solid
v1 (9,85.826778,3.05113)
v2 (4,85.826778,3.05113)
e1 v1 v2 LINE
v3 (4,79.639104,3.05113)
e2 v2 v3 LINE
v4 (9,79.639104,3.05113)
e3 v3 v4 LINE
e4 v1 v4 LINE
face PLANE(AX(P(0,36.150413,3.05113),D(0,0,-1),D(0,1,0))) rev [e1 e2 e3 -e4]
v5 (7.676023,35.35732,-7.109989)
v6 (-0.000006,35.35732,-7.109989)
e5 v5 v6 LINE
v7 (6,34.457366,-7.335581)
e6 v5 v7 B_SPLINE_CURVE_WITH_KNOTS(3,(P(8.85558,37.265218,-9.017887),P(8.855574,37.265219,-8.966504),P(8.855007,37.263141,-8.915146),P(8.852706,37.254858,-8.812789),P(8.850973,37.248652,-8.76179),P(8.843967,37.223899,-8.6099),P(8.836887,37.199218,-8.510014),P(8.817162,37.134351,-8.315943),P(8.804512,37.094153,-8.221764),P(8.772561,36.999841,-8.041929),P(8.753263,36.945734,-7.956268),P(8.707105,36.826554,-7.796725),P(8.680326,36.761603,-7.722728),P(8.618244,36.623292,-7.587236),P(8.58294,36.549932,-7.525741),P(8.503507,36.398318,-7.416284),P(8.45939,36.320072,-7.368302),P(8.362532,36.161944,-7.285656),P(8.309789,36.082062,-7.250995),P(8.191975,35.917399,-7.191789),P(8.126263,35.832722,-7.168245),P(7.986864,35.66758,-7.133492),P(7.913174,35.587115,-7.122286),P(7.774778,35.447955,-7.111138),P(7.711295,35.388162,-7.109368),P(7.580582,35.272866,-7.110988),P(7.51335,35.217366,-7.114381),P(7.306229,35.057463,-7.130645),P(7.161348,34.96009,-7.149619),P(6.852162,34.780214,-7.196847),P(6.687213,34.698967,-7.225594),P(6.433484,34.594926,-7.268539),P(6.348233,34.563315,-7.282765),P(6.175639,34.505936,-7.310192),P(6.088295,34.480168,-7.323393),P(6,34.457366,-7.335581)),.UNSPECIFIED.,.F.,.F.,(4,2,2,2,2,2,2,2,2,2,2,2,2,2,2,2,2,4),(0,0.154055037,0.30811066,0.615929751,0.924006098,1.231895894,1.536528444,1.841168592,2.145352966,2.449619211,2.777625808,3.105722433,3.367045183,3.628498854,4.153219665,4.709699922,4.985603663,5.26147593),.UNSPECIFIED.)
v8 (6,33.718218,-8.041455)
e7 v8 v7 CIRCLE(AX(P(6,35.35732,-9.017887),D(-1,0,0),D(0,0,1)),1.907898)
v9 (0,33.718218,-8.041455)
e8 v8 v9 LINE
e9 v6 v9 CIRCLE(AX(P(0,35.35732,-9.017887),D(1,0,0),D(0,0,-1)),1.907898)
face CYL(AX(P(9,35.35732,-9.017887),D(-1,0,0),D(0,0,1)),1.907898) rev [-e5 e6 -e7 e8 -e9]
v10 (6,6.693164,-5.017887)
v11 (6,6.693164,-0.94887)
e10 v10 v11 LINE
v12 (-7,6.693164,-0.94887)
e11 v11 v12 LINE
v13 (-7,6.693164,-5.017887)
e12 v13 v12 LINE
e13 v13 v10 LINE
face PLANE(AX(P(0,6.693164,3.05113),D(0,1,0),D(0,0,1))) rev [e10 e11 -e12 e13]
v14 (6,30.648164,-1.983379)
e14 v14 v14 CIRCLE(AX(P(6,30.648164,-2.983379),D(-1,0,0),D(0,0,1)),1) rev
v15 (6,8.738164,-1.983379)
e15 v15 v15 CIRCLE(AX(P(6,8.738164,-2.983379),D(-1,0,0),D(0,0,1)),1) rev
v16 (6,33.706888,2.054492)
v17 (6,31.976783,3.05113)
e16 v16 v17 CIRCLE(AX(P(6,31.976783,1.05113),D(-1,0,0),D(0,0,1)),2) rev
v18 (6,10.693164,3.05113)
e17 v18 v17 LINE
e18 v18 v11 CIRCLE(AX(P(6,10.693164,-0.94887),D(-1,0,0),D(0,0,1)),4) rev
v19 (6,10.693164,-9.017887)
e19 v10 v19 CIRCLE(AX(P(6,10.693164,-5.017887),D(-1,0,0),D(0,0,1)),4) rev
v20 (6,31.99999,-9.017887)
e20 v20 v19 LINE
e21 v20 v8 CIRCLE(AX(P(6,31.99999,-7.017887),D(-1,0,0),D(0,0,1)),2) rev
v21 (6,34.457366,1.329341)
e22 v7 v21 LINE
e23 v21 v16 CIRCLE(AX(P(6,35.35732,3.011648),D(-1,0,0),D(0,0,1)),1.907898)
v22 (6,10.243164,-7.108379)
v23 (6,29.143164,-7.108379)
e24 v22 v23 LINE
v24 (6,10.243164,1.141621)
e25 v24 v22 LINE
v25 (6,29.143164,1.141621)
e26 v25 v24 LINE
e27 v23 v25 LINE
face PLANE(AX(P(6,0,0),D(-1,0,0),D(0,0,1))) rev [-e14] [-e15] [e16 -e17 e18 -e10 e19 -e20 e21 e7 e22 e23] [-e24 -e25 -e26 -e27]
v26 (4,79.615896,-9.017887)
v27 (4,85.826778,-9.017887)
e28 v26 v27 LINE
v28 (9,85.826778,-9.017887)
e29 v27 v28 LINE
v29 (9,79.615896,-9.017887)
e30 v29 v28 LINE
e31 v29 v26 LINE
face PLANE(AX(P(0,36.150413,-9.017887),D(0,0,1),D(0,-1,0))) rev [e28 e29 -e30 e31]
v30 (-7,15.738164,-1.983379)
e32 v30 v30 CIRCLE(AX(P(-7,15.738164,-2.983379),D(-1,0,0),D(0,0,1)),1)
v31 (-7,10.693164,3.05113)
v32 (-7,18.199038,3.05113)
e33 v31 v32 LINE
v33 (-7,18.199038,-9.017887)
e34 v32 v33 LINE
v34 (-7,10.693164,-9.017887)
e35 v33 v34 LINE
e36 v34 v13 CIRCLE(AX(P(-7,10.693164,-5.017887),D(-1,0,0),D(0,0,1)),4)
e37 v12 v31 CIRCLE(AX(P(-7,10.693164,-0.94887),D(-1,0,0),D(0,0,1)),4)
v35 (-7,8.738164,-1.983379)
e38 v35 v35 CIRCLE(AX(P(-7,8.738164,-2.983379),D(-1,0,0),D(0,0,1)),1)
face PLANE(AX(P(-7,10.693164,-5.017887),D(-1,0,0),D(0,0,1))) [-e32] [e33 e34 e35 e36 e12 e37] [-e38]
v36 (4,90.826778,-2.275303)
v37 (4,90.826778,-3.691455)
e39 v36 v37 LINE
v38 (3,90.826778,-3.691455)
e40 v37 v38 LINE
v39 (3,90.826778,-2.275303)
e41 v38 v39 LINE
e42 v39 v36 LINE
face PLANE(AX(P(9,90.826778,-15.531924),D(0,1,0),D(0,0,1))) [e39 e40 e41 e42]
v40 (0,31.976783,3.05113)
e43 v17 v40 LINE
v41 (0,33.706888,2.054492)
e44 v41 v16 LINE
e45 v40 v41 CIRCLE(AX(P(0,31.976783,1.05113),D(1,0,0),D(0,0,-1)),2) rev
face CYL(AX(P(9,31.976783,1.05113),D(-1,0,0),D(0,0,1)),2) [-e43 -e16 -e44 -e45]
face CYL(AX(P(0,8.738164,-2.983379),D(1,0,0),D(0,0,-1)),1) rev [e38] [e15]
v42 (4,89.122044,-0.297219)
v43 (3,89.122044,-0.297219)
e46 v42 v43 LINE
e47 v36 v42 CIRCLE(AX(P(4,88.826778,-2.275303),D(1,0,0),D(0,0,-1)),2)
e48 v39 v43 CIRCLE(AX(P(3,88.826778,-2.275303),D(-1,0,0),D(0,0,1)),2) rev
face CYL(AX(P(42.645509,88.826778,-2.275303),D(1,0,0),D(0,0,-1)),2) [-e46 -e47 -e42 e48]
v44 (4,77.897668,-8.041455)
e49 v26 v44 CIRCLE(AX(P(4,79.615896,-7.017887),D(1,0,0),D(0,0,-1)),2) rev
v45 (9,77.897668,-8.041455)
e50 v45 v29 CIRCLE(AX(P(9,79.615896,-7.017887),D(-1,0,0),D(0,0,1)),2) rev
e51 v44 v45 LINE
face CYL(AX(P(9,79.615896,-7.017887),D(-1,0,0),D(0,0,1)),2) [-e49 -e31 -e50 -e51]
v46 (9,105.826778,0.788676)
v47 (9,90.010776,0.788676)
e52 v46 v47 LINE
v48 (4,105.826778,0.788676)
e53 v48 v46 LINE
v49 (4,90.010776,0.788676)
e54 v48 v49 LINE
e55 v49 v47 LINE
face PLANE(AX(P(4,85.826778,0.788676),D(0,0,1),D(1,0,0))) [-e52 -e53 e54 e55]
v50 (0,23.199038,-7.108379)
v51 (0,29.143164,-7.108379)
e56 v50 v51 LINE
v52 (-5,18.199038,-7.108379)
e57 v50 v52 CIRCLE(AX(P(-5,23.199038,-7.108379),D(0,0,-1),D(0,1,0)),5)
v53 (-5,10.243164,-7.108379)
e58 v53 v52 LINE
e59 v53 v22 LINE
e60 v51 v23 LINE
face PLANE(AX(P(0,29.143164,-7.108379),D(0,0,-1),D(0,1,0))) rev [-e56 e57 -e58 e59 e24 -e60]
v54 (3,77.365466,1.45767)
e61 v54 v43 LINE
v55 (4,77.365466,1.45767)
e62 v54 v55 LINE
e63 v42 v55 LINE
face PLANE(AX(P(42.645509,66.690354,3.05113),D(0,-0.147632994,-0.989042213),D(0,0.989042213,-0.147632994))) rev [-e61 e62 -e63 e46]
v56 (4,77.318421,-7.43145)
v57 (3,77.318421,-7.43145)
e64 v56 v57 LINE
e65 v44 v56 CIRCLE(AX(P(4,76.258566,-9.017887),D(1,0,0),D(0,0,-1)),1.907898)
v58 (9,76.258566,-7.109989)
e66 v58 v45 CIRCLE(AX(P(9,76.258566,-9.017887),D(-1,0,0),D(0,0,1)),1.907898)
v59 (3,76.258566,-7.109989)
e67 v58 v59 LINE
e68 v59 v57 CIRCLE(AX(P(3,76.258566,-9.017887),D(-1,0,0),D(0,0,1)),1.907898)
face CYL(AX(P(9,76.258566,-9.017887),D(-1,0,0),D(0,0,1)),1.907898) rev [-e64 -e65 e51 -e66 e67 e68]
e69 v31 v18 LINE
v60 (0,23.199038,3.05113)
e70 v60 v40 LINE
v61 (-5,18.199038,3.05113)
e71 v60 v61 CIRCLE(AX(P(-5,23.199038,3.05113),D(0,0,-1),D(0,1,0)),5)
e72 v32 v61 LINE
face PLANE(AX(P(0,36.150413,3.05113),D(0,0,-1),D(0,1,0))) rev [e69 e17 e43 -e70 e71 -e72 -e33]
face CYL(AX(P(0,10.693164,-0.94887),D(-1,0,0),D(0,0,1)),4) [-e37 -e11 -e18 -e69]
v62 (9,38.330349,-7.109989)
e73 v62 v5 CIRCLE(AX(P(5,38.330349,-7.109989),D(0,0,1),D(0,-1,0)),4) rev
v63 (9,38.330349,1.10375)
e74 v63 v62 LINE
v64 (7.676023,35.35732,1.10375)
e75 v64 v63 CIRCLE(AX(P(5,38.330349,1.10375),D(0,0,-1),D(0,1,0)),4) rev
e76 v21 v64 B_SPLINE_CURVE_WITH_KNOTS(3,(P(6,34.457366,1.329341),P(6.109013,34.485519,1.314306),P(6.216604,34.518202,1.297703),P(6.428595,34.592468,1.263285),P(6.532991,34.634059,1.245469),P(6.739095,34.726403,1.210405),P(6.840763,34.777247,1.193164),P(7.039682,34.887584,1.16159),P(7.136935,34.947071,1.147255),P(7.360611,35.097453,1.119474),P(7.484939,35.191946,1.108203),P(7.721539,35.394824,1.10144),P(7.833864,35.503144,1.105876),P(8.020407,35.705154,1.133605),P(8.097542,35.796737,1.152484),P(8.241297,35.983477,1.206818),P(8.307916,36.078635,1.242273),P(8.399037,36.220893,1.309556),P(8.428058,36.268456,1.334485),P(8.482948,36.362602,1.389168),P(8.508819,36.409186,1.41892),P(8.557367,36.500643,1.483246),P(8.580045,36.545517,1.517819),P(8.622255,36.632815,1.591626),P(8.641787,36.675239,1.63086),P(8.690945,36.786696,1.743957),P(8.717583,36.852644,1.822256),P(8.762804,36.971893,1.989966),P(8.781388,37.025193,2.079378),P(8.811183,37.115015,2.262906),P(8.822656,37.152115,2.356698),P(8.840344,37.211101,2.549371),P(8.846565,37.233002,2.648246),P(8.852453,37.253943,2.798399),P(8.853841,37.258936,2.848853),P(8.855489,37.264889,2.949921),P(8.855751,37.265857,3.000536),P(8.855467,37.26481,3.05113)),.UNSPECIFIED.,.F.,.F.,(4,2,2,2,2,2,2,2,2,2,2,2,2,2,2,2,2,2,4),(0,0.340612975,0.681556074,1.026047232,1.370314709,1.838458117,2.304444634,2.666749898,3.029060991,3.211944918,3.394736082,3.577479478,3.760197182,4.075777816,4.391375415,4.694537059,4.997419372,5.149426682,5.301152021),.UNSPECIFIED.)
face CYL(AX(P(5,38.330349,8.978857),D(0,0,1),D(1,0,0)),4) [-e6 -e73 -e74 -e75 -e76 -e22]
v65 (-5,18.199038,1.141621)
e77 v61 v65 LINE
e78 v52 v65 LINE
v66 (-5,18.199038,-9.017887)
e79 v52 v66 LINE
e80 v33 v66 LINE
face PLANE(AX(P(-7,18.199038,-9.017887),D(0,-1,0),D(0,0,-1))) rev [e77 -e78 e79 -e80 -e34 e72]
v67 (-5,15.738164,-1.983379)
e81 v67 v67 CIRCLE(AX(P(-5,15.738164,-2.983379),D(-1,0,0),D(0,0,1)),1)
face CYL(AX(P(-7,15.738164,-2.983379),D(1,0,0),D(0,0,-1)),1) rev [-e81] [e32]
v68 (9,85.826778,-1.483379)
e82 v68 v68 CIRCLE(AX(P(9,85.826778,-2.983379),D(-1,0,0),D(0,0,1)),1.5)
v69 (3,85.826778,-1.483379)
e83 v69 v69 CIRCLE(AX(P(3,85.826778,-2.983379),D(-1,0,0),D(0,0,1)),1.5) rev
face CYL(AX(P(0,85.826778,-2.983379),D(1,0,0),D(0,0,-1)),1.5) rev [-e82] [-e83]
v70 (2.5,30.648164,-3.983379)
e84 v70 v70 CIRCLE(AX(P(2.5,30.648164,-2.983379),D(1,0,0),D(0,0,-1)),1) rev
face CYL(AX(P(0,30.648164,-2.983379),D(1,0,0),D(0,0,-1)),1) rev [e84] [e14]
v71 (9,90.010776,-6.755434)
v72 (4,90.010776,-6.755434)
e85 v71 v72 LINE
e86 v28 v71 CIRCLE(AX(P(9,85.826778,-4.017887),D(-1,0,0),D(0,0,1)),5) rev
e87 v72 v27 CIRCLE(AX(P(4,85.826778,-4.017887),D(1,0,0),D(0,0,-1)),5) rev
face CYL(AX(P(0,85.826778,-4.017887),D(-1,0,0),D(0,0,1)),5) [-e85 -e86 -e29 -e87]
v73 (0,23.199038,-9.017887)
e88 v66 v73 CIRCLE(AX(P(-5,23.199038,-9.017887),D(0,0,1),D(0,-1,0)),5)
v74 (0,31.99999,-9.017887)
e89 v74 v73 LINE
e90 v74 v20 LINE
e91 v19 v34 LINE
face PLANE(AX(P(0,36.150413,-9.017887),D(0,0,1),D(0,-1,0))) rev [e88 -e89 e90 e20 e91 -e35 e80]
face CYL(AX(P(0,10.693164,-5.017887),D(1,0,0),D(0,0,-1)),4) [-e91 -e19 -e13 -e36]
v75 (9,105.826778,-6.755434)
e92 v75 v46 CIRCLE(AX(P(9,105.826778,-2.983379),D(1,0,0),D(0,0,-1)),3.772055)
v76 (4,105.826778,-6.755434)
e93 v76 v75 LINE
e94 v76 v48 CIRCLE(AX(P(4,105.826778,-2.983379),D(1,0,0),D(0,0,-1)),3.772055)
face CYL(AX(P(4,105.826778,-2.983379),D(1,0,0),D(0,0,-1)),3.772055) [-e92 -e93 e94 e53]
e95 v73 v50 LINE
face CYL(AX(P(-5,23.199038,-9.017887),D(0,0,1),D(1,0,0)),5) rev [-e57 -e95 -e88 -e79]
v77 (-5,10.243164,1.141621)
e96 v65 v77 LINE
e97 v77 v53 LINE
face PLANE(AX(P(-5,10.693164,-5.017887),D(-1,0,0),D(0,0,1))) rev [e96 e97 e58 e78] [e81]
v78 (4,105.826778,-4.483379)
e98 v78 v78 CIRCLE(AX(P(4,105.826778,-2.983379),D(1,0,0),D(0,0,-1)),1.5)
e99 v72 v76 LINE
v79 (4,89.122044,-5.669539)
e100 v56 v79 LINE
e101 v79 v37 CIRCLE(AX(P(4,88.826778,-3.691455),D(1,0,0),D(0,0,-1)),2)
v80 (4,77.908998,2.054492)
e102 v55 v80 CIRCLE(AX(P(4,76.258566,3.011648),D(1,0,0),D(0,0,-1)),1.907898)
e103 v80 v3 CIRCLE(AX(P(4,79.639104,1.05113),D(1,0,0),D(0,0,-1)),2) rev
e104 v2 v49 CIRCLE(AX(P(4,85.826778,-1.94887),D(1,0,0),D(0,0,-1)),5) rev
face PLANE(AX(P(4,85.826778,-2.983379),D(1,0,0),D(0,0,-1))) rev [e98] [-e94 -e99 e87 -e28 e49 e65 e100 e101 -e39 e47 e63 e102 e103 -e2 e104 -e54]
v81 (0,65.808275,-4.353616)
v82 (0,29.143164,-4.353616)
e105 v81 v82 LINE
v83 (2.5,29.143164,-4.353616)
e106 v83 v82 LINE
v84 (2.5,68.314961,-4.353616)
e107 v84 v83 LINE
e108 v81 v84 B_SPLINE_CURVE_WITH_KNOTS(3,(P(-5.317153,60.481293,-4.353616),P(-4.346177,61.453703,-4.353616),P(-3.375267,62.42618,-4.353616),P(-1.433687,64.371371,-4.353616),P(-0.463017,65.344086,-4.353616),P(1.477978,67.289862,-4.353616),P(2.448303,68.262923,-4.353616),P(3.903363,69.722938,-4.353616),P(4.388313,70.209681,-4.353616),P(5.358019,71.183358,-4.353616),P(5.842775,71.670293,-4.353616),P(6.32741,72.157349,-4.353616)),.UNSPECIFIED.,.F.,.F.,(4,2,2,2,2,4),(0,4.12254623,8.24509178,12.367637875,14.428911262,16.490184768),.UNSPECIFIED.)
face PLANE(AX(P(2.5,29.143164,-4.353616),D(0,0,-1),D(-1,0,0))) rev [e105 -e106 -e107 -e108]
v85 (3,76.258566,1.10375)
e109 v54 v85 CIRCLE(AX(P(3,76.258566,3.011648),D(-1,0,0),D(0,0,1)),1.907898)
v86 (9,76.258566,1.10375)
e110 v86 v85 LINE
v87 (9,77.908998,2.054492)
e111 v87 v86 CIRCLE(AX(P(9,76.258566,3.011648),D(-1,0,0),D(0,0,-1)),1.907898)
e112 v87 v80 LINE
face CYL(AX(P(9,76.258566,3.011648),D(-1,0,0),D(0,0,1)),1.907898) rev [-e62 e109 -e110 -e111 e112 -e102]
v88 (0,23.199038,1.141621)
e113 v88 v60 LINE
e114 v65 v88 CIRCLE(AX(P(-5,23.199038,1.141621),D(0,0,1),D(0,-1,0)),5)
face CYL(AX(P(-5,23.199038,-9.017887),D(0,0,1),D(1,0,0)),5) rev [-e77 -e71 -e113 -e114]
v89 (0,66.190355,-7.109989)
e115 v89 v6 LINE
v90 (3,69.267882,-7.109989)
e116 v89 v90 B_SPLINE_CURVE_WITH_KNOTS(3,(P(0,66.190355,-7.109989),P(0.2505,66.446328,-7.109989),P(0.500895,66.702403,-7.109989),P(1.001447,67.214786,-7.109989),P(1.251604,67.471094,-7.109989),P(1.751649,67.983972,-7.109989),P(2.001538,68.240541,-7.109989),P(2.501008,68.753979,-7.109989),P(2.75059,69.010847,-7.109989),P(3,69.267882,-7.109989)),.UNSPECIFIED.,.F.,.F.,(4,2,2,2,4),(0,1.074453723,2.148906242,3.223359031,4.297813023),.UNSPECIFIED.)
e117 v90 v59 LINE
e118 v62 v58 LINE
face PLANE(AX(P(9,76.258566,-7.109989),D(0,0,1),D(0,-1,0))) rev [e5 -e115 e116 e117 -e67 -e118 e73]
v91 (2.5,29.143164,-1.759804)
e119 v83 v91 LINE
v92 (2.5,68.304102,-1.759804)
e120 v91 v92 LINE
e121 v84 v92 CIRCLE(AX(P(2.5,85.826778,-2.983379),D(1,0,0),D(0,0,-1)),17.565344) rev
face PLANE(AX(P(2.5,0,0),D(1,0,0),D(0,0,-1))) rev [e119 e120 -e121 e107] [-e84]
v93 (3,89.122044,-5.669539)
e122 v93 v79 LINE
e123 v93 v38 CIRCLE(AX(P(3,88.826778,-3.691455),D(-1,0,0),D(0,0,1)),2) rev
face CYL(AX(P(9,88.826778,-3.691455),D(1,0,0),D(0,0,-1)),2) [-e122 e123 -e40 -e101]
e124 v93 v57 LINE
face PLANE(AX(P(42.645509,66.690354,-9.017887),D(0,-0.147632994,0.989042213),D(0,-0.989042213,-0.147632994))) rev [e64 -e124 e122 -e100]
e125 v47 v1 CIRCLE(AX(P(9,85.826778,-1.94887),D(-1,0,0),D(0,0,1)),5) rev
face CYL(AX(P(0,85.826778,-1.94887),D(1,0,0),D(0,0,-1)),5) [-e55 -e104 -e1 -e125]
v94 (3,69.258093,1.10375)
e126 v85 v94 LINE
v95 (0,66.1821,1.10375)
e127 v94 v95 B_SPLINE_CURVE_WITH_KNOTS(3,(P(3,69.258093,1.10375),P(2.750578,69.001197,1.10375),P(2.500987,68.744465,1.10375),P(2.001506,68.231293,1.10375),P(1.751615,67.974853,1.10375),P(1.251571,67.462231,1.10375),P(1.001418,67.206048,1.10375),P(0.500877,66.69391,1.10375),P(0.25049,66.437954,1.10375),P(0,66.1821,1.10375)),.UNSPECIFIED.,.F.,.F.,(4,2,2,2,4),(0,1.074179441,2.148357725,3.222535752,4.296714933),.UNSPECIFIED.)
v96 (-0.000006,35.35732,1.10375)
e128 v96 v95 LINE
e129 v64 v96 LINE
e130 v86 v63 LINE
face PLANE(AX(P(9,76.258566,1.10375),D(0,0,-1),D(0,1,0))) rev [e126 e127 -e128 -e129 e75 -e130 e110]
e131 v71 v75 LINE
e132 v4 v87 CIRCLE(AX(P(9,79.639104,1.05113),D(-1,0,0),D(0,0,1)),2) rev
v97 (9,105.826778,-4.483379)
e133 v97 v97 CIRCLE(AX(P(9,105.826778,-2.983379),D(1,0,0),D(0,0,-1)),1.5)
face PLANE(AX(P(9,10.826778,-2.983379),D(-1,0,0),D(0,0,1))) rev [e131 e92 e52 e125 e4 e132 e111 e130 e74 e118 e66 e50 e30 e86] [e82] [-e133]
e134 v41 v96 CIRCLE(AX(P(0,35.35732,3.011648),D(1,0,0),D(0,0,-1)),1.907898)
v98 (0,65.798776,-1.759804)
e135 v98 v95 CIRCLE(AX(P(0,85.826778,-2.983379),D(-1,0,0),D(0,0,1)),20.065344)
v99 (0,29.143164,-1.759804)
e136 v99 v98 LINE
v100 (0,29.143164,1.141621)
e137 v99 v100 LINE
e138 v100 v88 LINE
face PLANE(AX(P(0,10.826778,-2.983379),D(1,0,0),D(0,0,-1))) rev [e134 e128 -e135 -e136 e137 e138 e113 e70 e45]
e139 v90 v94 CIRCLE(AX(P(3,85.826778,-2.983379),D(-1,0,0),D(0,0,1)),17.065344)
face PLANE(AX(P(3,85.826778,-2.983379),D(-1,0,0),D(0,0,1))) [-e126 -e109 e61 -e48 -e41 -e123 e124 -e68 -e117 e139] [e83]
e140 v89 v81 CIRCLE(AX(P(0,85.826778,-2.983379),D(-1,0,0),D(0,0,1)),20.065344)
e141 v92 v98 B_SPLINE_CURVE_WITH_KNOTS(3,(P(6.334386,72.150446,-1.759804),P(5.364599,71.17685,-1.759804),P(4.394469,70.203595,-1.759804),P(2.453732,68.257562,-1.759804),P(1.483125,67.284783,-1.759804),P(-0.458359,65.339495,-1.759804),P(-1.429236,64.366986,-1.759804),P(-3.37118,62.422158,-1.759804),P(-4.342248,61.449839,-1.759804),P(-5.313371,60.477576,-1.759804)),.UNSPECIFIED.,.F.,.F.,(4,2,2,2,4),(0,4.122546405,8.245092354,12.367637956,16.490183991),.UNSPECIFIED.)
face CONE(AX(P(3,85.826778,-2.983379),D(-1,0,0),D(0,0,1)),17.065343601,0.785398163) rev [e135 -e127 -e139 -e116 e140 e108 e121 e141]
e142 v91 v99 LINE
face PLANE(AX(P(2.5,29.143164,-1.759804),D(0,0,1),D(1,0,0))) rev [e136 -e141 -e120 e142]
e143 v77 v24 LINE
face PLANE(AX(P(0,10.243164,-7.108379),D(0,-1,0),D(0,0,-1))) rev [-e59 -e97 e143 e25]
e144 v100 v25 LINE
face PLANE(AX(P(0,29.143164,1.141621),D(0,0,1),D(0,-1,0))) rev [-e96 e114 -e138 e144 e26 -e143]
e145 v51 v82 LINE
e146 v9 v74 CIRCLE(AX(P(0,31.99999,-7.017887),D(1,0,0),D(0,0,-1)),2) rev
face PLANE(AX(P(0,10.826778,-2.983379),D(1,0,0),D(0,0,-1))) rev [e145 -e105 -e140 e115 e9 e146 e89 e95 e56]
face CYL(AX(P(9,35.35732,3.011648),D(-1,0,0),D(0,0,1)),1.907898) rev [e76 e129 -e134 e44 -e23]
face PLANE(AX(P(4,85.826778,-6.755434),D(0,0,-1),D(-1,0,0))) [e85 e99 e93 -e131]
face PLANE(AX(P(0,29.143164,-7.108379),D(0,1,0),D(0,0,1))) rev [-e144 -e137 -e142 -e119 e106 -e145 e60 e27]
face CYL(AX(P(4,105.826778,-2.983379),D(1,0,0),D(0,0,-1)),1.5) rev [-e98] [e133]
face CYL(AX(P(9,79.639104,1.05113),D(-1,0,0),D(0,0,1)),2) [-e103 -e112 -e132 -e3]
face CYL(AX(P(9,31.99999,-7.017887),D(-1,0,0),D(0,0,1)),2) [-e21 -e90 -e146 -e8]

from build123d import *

# Parameters (mm, degrees)
SKETCH1_R               = 10
SKETCH1_R_2             = 0.8
SKETCH1_R_3             = 3.301767793
BOSS_EXTRUDE1_DEPTH     = 1.5
SKETCH2_R               = 10
BOSS_EXTRUDE2_DEPTH     = 9
CUT_EXTRUDE1_DEPTH      = 93.583714931
CUT_EXTRUDE1_DEPTH_BACK = 93.583714931
SKETCH3_R               = 1.5
FILLET1_R               = 5
SKETCH4_R               = 1.5
BOSS_EXTRUDE3_DEPTH     = 5
CUT_EXTRUDE2_DEPTH      = 4
FILLET3_R               = 2
SKETCH6_W               = 12.069016708
SKETCH6_H               = 36.150412664
BOSS_EXTRUDE4_DEPTH     = 9
CUT_EXTRUDE3_DEPTH      = 112.059195252
CUT_EXTRUDE3_DEPTH_BACK = 112.059195252
CUT_EXTRUDE4_DEPTH      = 111.336877259
CUT_EXTRUDE4_DEPTH_BACK = 111.336877259
SKETCH8_R               = 1
SKETCH8_W               = 8.25
SKETCH8_H               = 18.9
FILLET4_R               = 4
SKETCH9_W               = 24.382356312
SKETCH9_H               = 35.371587325
CUT_EXTRUDE5_DEPTH      = 3
FILLET5_R               = 4
SKETCH10_R              = 20.065343601
CUT_EXTRUDE6_DEPTH      = 3
CUT_EXTRUDE7_DEPTH      = 111.33687725
CUT_EXTRUDE7_DEPTH_BACK = 111.33687725
FILLET6_R               = 2
CHAMFER1_SIZE           = 3
BOSS_EXTRUDE5_START     = 7
SKETCH12_R              = 1
BOSS_EXTRUDE5_DEPTH     = 7
SKETCH13_W              = 8.25
SKETCH13_H              = 7.955873605
CUT_EXTRUDE8_DEPTH      = 5
FILLET7_R               = 5
SKETCH14_W              = 2.593812074
SKETCH14_H              = 55.177011507
CUT_EXTRUDE9_DEPTH      = 2.5


# Some blends are built 0.0001 mm under size
with BuildPart() as part:
    # Sketch1 → Boss-Extrude1 (new body)
    with BuildSketch(Plane(origin=(0, 0, 0), x_dir=(0, 0, -1), z_dir=(1, 0, 0))):
        with Locations((2.983378847, 10.826778074)):
            Circle(SKETCH1_R)
        with Locations((2.983378847, 18.576778074)):
            Circle(SKETCH1_R_2, mode=Mode.SUBTRACT)
        with Locations((2.983378847, 3.076778074)):
            Circle(SKETCH1_R_2, mode=Mode.SUBTRACT)
        with Locations((-3.266621153, 10.826778074)):
            Circle(SKETCH1_R_2, mode=Mode.SUBTRACT)
        with Locations((9.233378847, 10.826778074)):
            Circle(SKETCH1_R_2, mode=Mode.SUBTRACT)
        with Locations((2.983378847, 10.826778074)):
            Circle(SKETCH1_R_3, mode=Mode.SUBTRACT)
    extrude(amount=BOSS_EXTRUDE1_DEPTH)

    # Sketch2 → Boss-Extrude2 (add)
    with BuildSketch(Plane.ZY):
        with BuildLine():
            Line((-15.531923741, 90.826778074), (9.565166047, 90.826778074))
            Line((9.565166047, 90.826778074), (9.565166047, 10.826778074))
            ThreePointArc((9.565166047, 10.826778074), (-2.983378847, -1.721766821), (-15.531923741, 10.826778074))
            Line((-15.531923741, 10.826778074), (-15.531923741, 90.826778074))
        make_face()
        with Locations((-2.983378847, 10.826778074)):
            Circle(SKETCH2_R, mode=Mode.SUBTRACT)
    extrude(amount=-BOSS_EXTRUDE2_DEPTH)

    # Sketch3 → Cut-Extrude1 (cut, two sides: drawn at the far end of the back side and taken through both)
    with BuildSketch(Plane(origin=(9, 0, 0), x_dir=(0, 0, -1), z_dir=(1, 0, 0)).offset(-CUT_EXTRUDE1_DEPTH_BACK)):
        with Locations((2.983378847, 85.826778074)):
            Circle(SKETCH3_R)
        with BuildLine():
            Line((-3.051129507, 36.150412664), (-3.051129507, 97.572569437))
            Line((-3.051129507, 97.572569437), (-16.389018159, 97.572569437))
            Line((-16.389018159, 97.572569437), (-16.389018159, 8.14109285))
            Line((-16.389018159, 8.14109285), (-9.565166047, 10.826778074))
            add(Edge.make_bspline(
                [(-9.565166047, 10.826778074), (-9.644230884, 15.122204253), (-6.916245701, 23.507010268), (-3.42826878, 31.561714956), (-3.051129507, 36.150412664)],
                knots=[0, 0, 0, 0, 0.482384809, 1, 1, 1, 1], degree=3))
        make_face()
        with BuildLine():
            Line((22.355775853, 8.14109285), (15.531923741, 10.826778074))
            add(Edge.make_bspline(
                [(15.531923741, 10.826778074), (15.610988578, 15.122204253), (12.883003395, 23.507010268), (9.395026474, 31.561714956), (9.017887201, 36.150412664)],
                knots=[0, 0, 0, 0, 0.482384809, 1, 1, 1, 1], degree=3))
            Line((9.017887201, 36.150412664), (9.017887201, 97.572569437))
            Line((9.017887201, 97.572569437), (22.355775853, 97.572569437))
            Line((22.355775853, 97.572569437), (22.355775853, 8.14109285))
        make_face()
    extrude(amount=CUT_EXTRUDE1_DEPTH + CUT_EXTRUDE1_DEPTH_BACK, mode=Mode.SUBTRACT)

    # Fillet1
    fillet1_edges = [part.edges().sort_by_distance(p)[0] for p in [
        (4.5, 90.826778074, 3.051129507),
        (4.5, 90.826778074, -9.017887201),
    ]]
    fillet(fillet1_edges, radius=FILLET1_R)

    # Sketch4 → Boss-Extrude3 (add)
    with BuildSketch(Plane(origin=(9, 0, 0), x_dir=(0, 0, -1), z_dir=(1, 0, 0))):
        with BuildLine():
            Line((-0.788675957, 85.826778074), (-0.788675957, 105.826778074))
            ThreePointArc((-0.788675957, 105.826778074), (2.983378847, 109.598832877), (6.755433651, 105.826778074))
            Line((6.755433651, 105.826778074), (6.755433651, 85.826778074))
            ThreePointArc((6.755433651, 85.826778074), (2.983378847, 82.05472327), (-0.788675957, 85.826778074))
        make_face()
        with Locations((2.983378847, 105.826778074)):
            Circle(SKETCH4_R, mode=Mode.SUBTRACT)
        with Locations((2.983378847, 85.826778074)):
            Circle(SKETCH4_R, mode=Mode.SUBTRACT)
    extrude(amount=-BOSS_EXTRUDE3_DEPTH)

    # Sketch5 → Cut-Extrude2 (cut)
    with BuildSketch(Plane.ZY):
        Polygon((3.051129507, 66.690354093), (-0.520583075, 90.618436978), (8.994411849, 90.618436978), (4.452818785, 66.690354093), align=None)
        Polygon((-9.017887201, 66.690354093), (-5.446174619, 90.618436978), (-12.469802715, 95.280611626), (-31.447569196, 66.690354093), align=None)
    extrude(amount=-CUT_EXTRUDE2_DEPTH, mode=Mode.SUBTRACT)

    # Fillet3
    fillet3_edges = [part.edges().sort_by_distance(p)[0] for p in [
        (2, 90.618436978, -5.446174619),
        (2, 90.618436978, -0.520583075),
    ]]
    fillet(fillet3_edges, radius=FILLET3_R)

    # Sketch6 → Boss-Extrude4 (add)
    with BuildSketch(Plane(origin=(9, 0, 0), x_dir=(0, 0, -1), z_dir=(1, 0, 0))):
        with Locations((2.983378847, 18.075206332)):
            Rectangle(SKETCH6_W, SKETCH6_H)
    extrude(amount=-BOSS_EXTRUDE4_DEPTH)

    # Sketch7 → Cut-Extrude3 (cut, two sides: drawn at the far end of the back side and taken through both)
    with BuildSketch(Plane(origin=(9, 0, 0), x_dir=(0, 0, -1), z_dir=(1, 0, 0)).offset(-CUT_EXTRUDE3_DEPTH_BACK)):
        Polygon((-3.051129507, -1.9847985), (-23.499593466, -1.9847985), (-3.051129507, 36.150412664), (-3.051129507, 6.693164213), (9.017887201, 6.693164213), (9.017887201, 36.150412664), (33.091996179, 2.744303699), (9.017887201, -7.659721138), align=None)
    extrude(amount=CUT_EXTRUDE3_DEPTH + CUT_EXTRUDE3_DEPTH_BACK, mode=Mode.SUBTRACT)

    # Sketch8 → Cut-Extrude4 (cut, two sides: drawn at the far end of the back side and taken through both)
    with BuildSketch(Plane(origin=(9, 0, 0), x_dir=(0, 0, -1), z_dir=(1, 0, 0)).offset(-CUT_EXTRUDE4_DEPTH_BACK)):
        with Locations((2.983378847, 30.648164213)):
            Circle(SKETCH8_R)
        with Locations((2.983378847, 8.738164213)):
            Circle(SKETCH8_R)
        with Locations((2.983378847, 19.693164213)):
            Rectangle(SKETCH8_W, SKETCH8_H)
    extrude(amount=CUT_EXTRUDE4_DEPTH + CUT_EXTRUDE4_DEPTH_BACK, mode=Mode.SUBTRACT)

    # Fillet4
    fillet4_edges = [part.edges().sort_by_distance(p)[0] for p in [
        (4.5, 6.693164213, -9.017887201),
        (4.5, 6.693164213, 3.051129507),
    ]]
    fillet(fillet4_edges, radius=FILLET4_R)

    # Sketch9 → Cut-Extrude5 (cut)
    with BuildSketch(Plane(origin=(9, 0, 0), x_dir=(0, 0, -1), z_dir=(1, 0, 0))):
        with Locations((3.21232116, 16.771571926)):
            Rectangle(SKETCH9_W, SKETCH9_H)
    extrude(amount=-CUT_EXTRUDE5_DEPTH, mode=Mode.SUBTRACT)

    # Fillet5
    # the kernel refuses this fillet: 4 mm, written as the material it takes off along each edge
    with BuildSketch(Plane(origin=(9, 34.457365588, -18.700345567), x_dir=(0, 1, 0), z_dir=(0, 0, 1))) as fillet5_piece_1:
        with BuildLine():
            CenterArc((3.872983346, 4), FILLET5_R, 194.477512186, 75.522487814)
            Line((0, 3), (-0.077459667, 2.98))
            ThreePointArc((-0.077459667, 2.98), (-0.08, 1.5), (-0.08, 0))
            Line((-0.08, 0), (0, -0.08))
            Line((0, -0.08), (3.872983346, -0.08))
            Line((3.872983346, -0.08), (3.872983346, 0))
        make_face()
    extrude(amount=31.43393344, mode=Mode.SUBTRACT)

    # Sketch10 → Cut-Extrude6 (cut)
    with BuildSketch(Plane.ZY):
        with Locations((-2.983378847, 85.826778074)):
            Circle(SKETCH10_R)
    extrude(amount=-CUT_EXTRUDE6_DEPTH, mode=Mode.SUBTRACT)

    # Sketch11 → Cut-Extrude7 (cut, two sides: drawn at the far end of the back side and taken through both)
    with BuildSketch(Plane.ZY.offset(-CUT_EXTRUDE7_DEPTH_BACK)):
        with BuildLine():
            Line((-7.109989343, 76.258566083), (-7.109989343, 35.357320381))
            ThreePointArc((-7.109989343, 35.357320381), (-9.017887201, 33.449422522), (-10.925785059, 35.357320381))
            Line((-10.925785059, 35.357320381), (-10.925785059, 76.258566083))
            ThreePointArc((-10.925785059, 76.258566083), (-9.017887201, 78.166463942), (-7.109989343, 76.258566083))
        make_face()
        with BuildLine():
            Line((1.103749815, 76.258566083), (1.103749815, 35.357320381))
            ThreePointArc((1.103749815, 35.357320381), (3.011647673, 33.449422522), (4.919545531, 35.357320381))
            Line((4.919545531, 35.357320381), (4.919545531, 76.258566083))
            ThreePointArc((4.919545531, 76.258566083), (3.011647673, 78.166463942), (1.103749815, 76.258566083))
        make_face()
    extrude(amount=CUT_EXTRUDE7_DEPTH + CUT_EXTRUDE7_DEPTH_BACK, mode=Mode.SUBTRACT)

    # Fillet6
    fillet6_edges = [part.edges().sort_by_distance(p)[0] for p in [
        (3, 33.449422522, -9.017887201),
        (3, 33.449831083, 3.051129507),
        (6.5, 78.166463942, -9.017887201),
        (6.5, 78.166055381, 3.051129507),
    ]]
    fillet(fillet6_edges, radius=FILLET6_R)

    # Chamfer1
    chamfer1_edges = [part.edges().sort_by_distance(p)[0] for p in [
        (3, 65.761444608, -3.003546718),
    ]]
    chamfer(chamfer1_edges, length=CHAMFER1_SIZE - 0.0001)  # a hair under: the kernel refuses the full size

    # Sketch12 → Boss-Extrude5 (add)
    with BuildSketch(Plane.ZY.offset(BOSS_EXTRUDE5_START)):
        with BuildLine():
            Line((-5.017887201, 6.693164213), (-0.948870493, 6.693164213))
            ThreePointArc((-0.948870493, 6.693164213), (1.879556632, 7.864737088), (3.051129507, 10.693164213))
            Line((3.051129507, 10.693164213), (3.051129507, 18.199037818))
            Line((3.051129507, 18.199037818), (-9.017887201, 18.199037818))
            Line((-9.017887201, 18.199037818), (-9.017887201, 10.693164213))
            ThreePointArc((-9.017887201, 10.693164213), (-7.846314326, 7.864737088), (-5.017887201, 6.693164213))
        make_face()
        with Locations((-2.983378847, 8.738164213)):
            Circle(SKETCH12_R, mode=Mode.SUBTRACT)
        with Locations((-2.983378847, 15.738164213)):
            Circle(SKETCH12_R, mode=Mode.SUBTRACT)
    extrude(amount=-BOSS_EXTRUDE5_DEPTH)

    # Sketch13 → Cut-Extrude8 (cut)
    with BuildSketch(Plane(origin=(0, 0, 0), x_dir=(0, 0, -1), z_dir=(1, 0, 0))):
        with Locations((2.983378847, 14.221101016)):
            Rectangle(SKETCH13_W, SKETCH13_H)
    extrude(amount=-CUT_EXTRUDE8_DEPTH, mode=Mode.SUBTRACT)

    # Fillet7
    fillet7_edges = [part.edges().sort_by_distance(p)[0] for p in [
        (0, 18.199037818, -8.063133024),
        (0, 18.199037818, 2.09637533),
    ]]
    fillet(fillet7_edges, radius=FILLET7_R)

    # Sketch14 → Cut-Extrude9 (cut)
    with BuildSketch(Plane.ZY):
        with Locations((-3.056710113, 56.731669967)):
            Rectangle(SKETCH14_W, SKETCH14_H)
    extrude(amount=-CUT_EXTRUDE9_DEPTH, mode=Mode.SUBTRACT)


solid = part.part
